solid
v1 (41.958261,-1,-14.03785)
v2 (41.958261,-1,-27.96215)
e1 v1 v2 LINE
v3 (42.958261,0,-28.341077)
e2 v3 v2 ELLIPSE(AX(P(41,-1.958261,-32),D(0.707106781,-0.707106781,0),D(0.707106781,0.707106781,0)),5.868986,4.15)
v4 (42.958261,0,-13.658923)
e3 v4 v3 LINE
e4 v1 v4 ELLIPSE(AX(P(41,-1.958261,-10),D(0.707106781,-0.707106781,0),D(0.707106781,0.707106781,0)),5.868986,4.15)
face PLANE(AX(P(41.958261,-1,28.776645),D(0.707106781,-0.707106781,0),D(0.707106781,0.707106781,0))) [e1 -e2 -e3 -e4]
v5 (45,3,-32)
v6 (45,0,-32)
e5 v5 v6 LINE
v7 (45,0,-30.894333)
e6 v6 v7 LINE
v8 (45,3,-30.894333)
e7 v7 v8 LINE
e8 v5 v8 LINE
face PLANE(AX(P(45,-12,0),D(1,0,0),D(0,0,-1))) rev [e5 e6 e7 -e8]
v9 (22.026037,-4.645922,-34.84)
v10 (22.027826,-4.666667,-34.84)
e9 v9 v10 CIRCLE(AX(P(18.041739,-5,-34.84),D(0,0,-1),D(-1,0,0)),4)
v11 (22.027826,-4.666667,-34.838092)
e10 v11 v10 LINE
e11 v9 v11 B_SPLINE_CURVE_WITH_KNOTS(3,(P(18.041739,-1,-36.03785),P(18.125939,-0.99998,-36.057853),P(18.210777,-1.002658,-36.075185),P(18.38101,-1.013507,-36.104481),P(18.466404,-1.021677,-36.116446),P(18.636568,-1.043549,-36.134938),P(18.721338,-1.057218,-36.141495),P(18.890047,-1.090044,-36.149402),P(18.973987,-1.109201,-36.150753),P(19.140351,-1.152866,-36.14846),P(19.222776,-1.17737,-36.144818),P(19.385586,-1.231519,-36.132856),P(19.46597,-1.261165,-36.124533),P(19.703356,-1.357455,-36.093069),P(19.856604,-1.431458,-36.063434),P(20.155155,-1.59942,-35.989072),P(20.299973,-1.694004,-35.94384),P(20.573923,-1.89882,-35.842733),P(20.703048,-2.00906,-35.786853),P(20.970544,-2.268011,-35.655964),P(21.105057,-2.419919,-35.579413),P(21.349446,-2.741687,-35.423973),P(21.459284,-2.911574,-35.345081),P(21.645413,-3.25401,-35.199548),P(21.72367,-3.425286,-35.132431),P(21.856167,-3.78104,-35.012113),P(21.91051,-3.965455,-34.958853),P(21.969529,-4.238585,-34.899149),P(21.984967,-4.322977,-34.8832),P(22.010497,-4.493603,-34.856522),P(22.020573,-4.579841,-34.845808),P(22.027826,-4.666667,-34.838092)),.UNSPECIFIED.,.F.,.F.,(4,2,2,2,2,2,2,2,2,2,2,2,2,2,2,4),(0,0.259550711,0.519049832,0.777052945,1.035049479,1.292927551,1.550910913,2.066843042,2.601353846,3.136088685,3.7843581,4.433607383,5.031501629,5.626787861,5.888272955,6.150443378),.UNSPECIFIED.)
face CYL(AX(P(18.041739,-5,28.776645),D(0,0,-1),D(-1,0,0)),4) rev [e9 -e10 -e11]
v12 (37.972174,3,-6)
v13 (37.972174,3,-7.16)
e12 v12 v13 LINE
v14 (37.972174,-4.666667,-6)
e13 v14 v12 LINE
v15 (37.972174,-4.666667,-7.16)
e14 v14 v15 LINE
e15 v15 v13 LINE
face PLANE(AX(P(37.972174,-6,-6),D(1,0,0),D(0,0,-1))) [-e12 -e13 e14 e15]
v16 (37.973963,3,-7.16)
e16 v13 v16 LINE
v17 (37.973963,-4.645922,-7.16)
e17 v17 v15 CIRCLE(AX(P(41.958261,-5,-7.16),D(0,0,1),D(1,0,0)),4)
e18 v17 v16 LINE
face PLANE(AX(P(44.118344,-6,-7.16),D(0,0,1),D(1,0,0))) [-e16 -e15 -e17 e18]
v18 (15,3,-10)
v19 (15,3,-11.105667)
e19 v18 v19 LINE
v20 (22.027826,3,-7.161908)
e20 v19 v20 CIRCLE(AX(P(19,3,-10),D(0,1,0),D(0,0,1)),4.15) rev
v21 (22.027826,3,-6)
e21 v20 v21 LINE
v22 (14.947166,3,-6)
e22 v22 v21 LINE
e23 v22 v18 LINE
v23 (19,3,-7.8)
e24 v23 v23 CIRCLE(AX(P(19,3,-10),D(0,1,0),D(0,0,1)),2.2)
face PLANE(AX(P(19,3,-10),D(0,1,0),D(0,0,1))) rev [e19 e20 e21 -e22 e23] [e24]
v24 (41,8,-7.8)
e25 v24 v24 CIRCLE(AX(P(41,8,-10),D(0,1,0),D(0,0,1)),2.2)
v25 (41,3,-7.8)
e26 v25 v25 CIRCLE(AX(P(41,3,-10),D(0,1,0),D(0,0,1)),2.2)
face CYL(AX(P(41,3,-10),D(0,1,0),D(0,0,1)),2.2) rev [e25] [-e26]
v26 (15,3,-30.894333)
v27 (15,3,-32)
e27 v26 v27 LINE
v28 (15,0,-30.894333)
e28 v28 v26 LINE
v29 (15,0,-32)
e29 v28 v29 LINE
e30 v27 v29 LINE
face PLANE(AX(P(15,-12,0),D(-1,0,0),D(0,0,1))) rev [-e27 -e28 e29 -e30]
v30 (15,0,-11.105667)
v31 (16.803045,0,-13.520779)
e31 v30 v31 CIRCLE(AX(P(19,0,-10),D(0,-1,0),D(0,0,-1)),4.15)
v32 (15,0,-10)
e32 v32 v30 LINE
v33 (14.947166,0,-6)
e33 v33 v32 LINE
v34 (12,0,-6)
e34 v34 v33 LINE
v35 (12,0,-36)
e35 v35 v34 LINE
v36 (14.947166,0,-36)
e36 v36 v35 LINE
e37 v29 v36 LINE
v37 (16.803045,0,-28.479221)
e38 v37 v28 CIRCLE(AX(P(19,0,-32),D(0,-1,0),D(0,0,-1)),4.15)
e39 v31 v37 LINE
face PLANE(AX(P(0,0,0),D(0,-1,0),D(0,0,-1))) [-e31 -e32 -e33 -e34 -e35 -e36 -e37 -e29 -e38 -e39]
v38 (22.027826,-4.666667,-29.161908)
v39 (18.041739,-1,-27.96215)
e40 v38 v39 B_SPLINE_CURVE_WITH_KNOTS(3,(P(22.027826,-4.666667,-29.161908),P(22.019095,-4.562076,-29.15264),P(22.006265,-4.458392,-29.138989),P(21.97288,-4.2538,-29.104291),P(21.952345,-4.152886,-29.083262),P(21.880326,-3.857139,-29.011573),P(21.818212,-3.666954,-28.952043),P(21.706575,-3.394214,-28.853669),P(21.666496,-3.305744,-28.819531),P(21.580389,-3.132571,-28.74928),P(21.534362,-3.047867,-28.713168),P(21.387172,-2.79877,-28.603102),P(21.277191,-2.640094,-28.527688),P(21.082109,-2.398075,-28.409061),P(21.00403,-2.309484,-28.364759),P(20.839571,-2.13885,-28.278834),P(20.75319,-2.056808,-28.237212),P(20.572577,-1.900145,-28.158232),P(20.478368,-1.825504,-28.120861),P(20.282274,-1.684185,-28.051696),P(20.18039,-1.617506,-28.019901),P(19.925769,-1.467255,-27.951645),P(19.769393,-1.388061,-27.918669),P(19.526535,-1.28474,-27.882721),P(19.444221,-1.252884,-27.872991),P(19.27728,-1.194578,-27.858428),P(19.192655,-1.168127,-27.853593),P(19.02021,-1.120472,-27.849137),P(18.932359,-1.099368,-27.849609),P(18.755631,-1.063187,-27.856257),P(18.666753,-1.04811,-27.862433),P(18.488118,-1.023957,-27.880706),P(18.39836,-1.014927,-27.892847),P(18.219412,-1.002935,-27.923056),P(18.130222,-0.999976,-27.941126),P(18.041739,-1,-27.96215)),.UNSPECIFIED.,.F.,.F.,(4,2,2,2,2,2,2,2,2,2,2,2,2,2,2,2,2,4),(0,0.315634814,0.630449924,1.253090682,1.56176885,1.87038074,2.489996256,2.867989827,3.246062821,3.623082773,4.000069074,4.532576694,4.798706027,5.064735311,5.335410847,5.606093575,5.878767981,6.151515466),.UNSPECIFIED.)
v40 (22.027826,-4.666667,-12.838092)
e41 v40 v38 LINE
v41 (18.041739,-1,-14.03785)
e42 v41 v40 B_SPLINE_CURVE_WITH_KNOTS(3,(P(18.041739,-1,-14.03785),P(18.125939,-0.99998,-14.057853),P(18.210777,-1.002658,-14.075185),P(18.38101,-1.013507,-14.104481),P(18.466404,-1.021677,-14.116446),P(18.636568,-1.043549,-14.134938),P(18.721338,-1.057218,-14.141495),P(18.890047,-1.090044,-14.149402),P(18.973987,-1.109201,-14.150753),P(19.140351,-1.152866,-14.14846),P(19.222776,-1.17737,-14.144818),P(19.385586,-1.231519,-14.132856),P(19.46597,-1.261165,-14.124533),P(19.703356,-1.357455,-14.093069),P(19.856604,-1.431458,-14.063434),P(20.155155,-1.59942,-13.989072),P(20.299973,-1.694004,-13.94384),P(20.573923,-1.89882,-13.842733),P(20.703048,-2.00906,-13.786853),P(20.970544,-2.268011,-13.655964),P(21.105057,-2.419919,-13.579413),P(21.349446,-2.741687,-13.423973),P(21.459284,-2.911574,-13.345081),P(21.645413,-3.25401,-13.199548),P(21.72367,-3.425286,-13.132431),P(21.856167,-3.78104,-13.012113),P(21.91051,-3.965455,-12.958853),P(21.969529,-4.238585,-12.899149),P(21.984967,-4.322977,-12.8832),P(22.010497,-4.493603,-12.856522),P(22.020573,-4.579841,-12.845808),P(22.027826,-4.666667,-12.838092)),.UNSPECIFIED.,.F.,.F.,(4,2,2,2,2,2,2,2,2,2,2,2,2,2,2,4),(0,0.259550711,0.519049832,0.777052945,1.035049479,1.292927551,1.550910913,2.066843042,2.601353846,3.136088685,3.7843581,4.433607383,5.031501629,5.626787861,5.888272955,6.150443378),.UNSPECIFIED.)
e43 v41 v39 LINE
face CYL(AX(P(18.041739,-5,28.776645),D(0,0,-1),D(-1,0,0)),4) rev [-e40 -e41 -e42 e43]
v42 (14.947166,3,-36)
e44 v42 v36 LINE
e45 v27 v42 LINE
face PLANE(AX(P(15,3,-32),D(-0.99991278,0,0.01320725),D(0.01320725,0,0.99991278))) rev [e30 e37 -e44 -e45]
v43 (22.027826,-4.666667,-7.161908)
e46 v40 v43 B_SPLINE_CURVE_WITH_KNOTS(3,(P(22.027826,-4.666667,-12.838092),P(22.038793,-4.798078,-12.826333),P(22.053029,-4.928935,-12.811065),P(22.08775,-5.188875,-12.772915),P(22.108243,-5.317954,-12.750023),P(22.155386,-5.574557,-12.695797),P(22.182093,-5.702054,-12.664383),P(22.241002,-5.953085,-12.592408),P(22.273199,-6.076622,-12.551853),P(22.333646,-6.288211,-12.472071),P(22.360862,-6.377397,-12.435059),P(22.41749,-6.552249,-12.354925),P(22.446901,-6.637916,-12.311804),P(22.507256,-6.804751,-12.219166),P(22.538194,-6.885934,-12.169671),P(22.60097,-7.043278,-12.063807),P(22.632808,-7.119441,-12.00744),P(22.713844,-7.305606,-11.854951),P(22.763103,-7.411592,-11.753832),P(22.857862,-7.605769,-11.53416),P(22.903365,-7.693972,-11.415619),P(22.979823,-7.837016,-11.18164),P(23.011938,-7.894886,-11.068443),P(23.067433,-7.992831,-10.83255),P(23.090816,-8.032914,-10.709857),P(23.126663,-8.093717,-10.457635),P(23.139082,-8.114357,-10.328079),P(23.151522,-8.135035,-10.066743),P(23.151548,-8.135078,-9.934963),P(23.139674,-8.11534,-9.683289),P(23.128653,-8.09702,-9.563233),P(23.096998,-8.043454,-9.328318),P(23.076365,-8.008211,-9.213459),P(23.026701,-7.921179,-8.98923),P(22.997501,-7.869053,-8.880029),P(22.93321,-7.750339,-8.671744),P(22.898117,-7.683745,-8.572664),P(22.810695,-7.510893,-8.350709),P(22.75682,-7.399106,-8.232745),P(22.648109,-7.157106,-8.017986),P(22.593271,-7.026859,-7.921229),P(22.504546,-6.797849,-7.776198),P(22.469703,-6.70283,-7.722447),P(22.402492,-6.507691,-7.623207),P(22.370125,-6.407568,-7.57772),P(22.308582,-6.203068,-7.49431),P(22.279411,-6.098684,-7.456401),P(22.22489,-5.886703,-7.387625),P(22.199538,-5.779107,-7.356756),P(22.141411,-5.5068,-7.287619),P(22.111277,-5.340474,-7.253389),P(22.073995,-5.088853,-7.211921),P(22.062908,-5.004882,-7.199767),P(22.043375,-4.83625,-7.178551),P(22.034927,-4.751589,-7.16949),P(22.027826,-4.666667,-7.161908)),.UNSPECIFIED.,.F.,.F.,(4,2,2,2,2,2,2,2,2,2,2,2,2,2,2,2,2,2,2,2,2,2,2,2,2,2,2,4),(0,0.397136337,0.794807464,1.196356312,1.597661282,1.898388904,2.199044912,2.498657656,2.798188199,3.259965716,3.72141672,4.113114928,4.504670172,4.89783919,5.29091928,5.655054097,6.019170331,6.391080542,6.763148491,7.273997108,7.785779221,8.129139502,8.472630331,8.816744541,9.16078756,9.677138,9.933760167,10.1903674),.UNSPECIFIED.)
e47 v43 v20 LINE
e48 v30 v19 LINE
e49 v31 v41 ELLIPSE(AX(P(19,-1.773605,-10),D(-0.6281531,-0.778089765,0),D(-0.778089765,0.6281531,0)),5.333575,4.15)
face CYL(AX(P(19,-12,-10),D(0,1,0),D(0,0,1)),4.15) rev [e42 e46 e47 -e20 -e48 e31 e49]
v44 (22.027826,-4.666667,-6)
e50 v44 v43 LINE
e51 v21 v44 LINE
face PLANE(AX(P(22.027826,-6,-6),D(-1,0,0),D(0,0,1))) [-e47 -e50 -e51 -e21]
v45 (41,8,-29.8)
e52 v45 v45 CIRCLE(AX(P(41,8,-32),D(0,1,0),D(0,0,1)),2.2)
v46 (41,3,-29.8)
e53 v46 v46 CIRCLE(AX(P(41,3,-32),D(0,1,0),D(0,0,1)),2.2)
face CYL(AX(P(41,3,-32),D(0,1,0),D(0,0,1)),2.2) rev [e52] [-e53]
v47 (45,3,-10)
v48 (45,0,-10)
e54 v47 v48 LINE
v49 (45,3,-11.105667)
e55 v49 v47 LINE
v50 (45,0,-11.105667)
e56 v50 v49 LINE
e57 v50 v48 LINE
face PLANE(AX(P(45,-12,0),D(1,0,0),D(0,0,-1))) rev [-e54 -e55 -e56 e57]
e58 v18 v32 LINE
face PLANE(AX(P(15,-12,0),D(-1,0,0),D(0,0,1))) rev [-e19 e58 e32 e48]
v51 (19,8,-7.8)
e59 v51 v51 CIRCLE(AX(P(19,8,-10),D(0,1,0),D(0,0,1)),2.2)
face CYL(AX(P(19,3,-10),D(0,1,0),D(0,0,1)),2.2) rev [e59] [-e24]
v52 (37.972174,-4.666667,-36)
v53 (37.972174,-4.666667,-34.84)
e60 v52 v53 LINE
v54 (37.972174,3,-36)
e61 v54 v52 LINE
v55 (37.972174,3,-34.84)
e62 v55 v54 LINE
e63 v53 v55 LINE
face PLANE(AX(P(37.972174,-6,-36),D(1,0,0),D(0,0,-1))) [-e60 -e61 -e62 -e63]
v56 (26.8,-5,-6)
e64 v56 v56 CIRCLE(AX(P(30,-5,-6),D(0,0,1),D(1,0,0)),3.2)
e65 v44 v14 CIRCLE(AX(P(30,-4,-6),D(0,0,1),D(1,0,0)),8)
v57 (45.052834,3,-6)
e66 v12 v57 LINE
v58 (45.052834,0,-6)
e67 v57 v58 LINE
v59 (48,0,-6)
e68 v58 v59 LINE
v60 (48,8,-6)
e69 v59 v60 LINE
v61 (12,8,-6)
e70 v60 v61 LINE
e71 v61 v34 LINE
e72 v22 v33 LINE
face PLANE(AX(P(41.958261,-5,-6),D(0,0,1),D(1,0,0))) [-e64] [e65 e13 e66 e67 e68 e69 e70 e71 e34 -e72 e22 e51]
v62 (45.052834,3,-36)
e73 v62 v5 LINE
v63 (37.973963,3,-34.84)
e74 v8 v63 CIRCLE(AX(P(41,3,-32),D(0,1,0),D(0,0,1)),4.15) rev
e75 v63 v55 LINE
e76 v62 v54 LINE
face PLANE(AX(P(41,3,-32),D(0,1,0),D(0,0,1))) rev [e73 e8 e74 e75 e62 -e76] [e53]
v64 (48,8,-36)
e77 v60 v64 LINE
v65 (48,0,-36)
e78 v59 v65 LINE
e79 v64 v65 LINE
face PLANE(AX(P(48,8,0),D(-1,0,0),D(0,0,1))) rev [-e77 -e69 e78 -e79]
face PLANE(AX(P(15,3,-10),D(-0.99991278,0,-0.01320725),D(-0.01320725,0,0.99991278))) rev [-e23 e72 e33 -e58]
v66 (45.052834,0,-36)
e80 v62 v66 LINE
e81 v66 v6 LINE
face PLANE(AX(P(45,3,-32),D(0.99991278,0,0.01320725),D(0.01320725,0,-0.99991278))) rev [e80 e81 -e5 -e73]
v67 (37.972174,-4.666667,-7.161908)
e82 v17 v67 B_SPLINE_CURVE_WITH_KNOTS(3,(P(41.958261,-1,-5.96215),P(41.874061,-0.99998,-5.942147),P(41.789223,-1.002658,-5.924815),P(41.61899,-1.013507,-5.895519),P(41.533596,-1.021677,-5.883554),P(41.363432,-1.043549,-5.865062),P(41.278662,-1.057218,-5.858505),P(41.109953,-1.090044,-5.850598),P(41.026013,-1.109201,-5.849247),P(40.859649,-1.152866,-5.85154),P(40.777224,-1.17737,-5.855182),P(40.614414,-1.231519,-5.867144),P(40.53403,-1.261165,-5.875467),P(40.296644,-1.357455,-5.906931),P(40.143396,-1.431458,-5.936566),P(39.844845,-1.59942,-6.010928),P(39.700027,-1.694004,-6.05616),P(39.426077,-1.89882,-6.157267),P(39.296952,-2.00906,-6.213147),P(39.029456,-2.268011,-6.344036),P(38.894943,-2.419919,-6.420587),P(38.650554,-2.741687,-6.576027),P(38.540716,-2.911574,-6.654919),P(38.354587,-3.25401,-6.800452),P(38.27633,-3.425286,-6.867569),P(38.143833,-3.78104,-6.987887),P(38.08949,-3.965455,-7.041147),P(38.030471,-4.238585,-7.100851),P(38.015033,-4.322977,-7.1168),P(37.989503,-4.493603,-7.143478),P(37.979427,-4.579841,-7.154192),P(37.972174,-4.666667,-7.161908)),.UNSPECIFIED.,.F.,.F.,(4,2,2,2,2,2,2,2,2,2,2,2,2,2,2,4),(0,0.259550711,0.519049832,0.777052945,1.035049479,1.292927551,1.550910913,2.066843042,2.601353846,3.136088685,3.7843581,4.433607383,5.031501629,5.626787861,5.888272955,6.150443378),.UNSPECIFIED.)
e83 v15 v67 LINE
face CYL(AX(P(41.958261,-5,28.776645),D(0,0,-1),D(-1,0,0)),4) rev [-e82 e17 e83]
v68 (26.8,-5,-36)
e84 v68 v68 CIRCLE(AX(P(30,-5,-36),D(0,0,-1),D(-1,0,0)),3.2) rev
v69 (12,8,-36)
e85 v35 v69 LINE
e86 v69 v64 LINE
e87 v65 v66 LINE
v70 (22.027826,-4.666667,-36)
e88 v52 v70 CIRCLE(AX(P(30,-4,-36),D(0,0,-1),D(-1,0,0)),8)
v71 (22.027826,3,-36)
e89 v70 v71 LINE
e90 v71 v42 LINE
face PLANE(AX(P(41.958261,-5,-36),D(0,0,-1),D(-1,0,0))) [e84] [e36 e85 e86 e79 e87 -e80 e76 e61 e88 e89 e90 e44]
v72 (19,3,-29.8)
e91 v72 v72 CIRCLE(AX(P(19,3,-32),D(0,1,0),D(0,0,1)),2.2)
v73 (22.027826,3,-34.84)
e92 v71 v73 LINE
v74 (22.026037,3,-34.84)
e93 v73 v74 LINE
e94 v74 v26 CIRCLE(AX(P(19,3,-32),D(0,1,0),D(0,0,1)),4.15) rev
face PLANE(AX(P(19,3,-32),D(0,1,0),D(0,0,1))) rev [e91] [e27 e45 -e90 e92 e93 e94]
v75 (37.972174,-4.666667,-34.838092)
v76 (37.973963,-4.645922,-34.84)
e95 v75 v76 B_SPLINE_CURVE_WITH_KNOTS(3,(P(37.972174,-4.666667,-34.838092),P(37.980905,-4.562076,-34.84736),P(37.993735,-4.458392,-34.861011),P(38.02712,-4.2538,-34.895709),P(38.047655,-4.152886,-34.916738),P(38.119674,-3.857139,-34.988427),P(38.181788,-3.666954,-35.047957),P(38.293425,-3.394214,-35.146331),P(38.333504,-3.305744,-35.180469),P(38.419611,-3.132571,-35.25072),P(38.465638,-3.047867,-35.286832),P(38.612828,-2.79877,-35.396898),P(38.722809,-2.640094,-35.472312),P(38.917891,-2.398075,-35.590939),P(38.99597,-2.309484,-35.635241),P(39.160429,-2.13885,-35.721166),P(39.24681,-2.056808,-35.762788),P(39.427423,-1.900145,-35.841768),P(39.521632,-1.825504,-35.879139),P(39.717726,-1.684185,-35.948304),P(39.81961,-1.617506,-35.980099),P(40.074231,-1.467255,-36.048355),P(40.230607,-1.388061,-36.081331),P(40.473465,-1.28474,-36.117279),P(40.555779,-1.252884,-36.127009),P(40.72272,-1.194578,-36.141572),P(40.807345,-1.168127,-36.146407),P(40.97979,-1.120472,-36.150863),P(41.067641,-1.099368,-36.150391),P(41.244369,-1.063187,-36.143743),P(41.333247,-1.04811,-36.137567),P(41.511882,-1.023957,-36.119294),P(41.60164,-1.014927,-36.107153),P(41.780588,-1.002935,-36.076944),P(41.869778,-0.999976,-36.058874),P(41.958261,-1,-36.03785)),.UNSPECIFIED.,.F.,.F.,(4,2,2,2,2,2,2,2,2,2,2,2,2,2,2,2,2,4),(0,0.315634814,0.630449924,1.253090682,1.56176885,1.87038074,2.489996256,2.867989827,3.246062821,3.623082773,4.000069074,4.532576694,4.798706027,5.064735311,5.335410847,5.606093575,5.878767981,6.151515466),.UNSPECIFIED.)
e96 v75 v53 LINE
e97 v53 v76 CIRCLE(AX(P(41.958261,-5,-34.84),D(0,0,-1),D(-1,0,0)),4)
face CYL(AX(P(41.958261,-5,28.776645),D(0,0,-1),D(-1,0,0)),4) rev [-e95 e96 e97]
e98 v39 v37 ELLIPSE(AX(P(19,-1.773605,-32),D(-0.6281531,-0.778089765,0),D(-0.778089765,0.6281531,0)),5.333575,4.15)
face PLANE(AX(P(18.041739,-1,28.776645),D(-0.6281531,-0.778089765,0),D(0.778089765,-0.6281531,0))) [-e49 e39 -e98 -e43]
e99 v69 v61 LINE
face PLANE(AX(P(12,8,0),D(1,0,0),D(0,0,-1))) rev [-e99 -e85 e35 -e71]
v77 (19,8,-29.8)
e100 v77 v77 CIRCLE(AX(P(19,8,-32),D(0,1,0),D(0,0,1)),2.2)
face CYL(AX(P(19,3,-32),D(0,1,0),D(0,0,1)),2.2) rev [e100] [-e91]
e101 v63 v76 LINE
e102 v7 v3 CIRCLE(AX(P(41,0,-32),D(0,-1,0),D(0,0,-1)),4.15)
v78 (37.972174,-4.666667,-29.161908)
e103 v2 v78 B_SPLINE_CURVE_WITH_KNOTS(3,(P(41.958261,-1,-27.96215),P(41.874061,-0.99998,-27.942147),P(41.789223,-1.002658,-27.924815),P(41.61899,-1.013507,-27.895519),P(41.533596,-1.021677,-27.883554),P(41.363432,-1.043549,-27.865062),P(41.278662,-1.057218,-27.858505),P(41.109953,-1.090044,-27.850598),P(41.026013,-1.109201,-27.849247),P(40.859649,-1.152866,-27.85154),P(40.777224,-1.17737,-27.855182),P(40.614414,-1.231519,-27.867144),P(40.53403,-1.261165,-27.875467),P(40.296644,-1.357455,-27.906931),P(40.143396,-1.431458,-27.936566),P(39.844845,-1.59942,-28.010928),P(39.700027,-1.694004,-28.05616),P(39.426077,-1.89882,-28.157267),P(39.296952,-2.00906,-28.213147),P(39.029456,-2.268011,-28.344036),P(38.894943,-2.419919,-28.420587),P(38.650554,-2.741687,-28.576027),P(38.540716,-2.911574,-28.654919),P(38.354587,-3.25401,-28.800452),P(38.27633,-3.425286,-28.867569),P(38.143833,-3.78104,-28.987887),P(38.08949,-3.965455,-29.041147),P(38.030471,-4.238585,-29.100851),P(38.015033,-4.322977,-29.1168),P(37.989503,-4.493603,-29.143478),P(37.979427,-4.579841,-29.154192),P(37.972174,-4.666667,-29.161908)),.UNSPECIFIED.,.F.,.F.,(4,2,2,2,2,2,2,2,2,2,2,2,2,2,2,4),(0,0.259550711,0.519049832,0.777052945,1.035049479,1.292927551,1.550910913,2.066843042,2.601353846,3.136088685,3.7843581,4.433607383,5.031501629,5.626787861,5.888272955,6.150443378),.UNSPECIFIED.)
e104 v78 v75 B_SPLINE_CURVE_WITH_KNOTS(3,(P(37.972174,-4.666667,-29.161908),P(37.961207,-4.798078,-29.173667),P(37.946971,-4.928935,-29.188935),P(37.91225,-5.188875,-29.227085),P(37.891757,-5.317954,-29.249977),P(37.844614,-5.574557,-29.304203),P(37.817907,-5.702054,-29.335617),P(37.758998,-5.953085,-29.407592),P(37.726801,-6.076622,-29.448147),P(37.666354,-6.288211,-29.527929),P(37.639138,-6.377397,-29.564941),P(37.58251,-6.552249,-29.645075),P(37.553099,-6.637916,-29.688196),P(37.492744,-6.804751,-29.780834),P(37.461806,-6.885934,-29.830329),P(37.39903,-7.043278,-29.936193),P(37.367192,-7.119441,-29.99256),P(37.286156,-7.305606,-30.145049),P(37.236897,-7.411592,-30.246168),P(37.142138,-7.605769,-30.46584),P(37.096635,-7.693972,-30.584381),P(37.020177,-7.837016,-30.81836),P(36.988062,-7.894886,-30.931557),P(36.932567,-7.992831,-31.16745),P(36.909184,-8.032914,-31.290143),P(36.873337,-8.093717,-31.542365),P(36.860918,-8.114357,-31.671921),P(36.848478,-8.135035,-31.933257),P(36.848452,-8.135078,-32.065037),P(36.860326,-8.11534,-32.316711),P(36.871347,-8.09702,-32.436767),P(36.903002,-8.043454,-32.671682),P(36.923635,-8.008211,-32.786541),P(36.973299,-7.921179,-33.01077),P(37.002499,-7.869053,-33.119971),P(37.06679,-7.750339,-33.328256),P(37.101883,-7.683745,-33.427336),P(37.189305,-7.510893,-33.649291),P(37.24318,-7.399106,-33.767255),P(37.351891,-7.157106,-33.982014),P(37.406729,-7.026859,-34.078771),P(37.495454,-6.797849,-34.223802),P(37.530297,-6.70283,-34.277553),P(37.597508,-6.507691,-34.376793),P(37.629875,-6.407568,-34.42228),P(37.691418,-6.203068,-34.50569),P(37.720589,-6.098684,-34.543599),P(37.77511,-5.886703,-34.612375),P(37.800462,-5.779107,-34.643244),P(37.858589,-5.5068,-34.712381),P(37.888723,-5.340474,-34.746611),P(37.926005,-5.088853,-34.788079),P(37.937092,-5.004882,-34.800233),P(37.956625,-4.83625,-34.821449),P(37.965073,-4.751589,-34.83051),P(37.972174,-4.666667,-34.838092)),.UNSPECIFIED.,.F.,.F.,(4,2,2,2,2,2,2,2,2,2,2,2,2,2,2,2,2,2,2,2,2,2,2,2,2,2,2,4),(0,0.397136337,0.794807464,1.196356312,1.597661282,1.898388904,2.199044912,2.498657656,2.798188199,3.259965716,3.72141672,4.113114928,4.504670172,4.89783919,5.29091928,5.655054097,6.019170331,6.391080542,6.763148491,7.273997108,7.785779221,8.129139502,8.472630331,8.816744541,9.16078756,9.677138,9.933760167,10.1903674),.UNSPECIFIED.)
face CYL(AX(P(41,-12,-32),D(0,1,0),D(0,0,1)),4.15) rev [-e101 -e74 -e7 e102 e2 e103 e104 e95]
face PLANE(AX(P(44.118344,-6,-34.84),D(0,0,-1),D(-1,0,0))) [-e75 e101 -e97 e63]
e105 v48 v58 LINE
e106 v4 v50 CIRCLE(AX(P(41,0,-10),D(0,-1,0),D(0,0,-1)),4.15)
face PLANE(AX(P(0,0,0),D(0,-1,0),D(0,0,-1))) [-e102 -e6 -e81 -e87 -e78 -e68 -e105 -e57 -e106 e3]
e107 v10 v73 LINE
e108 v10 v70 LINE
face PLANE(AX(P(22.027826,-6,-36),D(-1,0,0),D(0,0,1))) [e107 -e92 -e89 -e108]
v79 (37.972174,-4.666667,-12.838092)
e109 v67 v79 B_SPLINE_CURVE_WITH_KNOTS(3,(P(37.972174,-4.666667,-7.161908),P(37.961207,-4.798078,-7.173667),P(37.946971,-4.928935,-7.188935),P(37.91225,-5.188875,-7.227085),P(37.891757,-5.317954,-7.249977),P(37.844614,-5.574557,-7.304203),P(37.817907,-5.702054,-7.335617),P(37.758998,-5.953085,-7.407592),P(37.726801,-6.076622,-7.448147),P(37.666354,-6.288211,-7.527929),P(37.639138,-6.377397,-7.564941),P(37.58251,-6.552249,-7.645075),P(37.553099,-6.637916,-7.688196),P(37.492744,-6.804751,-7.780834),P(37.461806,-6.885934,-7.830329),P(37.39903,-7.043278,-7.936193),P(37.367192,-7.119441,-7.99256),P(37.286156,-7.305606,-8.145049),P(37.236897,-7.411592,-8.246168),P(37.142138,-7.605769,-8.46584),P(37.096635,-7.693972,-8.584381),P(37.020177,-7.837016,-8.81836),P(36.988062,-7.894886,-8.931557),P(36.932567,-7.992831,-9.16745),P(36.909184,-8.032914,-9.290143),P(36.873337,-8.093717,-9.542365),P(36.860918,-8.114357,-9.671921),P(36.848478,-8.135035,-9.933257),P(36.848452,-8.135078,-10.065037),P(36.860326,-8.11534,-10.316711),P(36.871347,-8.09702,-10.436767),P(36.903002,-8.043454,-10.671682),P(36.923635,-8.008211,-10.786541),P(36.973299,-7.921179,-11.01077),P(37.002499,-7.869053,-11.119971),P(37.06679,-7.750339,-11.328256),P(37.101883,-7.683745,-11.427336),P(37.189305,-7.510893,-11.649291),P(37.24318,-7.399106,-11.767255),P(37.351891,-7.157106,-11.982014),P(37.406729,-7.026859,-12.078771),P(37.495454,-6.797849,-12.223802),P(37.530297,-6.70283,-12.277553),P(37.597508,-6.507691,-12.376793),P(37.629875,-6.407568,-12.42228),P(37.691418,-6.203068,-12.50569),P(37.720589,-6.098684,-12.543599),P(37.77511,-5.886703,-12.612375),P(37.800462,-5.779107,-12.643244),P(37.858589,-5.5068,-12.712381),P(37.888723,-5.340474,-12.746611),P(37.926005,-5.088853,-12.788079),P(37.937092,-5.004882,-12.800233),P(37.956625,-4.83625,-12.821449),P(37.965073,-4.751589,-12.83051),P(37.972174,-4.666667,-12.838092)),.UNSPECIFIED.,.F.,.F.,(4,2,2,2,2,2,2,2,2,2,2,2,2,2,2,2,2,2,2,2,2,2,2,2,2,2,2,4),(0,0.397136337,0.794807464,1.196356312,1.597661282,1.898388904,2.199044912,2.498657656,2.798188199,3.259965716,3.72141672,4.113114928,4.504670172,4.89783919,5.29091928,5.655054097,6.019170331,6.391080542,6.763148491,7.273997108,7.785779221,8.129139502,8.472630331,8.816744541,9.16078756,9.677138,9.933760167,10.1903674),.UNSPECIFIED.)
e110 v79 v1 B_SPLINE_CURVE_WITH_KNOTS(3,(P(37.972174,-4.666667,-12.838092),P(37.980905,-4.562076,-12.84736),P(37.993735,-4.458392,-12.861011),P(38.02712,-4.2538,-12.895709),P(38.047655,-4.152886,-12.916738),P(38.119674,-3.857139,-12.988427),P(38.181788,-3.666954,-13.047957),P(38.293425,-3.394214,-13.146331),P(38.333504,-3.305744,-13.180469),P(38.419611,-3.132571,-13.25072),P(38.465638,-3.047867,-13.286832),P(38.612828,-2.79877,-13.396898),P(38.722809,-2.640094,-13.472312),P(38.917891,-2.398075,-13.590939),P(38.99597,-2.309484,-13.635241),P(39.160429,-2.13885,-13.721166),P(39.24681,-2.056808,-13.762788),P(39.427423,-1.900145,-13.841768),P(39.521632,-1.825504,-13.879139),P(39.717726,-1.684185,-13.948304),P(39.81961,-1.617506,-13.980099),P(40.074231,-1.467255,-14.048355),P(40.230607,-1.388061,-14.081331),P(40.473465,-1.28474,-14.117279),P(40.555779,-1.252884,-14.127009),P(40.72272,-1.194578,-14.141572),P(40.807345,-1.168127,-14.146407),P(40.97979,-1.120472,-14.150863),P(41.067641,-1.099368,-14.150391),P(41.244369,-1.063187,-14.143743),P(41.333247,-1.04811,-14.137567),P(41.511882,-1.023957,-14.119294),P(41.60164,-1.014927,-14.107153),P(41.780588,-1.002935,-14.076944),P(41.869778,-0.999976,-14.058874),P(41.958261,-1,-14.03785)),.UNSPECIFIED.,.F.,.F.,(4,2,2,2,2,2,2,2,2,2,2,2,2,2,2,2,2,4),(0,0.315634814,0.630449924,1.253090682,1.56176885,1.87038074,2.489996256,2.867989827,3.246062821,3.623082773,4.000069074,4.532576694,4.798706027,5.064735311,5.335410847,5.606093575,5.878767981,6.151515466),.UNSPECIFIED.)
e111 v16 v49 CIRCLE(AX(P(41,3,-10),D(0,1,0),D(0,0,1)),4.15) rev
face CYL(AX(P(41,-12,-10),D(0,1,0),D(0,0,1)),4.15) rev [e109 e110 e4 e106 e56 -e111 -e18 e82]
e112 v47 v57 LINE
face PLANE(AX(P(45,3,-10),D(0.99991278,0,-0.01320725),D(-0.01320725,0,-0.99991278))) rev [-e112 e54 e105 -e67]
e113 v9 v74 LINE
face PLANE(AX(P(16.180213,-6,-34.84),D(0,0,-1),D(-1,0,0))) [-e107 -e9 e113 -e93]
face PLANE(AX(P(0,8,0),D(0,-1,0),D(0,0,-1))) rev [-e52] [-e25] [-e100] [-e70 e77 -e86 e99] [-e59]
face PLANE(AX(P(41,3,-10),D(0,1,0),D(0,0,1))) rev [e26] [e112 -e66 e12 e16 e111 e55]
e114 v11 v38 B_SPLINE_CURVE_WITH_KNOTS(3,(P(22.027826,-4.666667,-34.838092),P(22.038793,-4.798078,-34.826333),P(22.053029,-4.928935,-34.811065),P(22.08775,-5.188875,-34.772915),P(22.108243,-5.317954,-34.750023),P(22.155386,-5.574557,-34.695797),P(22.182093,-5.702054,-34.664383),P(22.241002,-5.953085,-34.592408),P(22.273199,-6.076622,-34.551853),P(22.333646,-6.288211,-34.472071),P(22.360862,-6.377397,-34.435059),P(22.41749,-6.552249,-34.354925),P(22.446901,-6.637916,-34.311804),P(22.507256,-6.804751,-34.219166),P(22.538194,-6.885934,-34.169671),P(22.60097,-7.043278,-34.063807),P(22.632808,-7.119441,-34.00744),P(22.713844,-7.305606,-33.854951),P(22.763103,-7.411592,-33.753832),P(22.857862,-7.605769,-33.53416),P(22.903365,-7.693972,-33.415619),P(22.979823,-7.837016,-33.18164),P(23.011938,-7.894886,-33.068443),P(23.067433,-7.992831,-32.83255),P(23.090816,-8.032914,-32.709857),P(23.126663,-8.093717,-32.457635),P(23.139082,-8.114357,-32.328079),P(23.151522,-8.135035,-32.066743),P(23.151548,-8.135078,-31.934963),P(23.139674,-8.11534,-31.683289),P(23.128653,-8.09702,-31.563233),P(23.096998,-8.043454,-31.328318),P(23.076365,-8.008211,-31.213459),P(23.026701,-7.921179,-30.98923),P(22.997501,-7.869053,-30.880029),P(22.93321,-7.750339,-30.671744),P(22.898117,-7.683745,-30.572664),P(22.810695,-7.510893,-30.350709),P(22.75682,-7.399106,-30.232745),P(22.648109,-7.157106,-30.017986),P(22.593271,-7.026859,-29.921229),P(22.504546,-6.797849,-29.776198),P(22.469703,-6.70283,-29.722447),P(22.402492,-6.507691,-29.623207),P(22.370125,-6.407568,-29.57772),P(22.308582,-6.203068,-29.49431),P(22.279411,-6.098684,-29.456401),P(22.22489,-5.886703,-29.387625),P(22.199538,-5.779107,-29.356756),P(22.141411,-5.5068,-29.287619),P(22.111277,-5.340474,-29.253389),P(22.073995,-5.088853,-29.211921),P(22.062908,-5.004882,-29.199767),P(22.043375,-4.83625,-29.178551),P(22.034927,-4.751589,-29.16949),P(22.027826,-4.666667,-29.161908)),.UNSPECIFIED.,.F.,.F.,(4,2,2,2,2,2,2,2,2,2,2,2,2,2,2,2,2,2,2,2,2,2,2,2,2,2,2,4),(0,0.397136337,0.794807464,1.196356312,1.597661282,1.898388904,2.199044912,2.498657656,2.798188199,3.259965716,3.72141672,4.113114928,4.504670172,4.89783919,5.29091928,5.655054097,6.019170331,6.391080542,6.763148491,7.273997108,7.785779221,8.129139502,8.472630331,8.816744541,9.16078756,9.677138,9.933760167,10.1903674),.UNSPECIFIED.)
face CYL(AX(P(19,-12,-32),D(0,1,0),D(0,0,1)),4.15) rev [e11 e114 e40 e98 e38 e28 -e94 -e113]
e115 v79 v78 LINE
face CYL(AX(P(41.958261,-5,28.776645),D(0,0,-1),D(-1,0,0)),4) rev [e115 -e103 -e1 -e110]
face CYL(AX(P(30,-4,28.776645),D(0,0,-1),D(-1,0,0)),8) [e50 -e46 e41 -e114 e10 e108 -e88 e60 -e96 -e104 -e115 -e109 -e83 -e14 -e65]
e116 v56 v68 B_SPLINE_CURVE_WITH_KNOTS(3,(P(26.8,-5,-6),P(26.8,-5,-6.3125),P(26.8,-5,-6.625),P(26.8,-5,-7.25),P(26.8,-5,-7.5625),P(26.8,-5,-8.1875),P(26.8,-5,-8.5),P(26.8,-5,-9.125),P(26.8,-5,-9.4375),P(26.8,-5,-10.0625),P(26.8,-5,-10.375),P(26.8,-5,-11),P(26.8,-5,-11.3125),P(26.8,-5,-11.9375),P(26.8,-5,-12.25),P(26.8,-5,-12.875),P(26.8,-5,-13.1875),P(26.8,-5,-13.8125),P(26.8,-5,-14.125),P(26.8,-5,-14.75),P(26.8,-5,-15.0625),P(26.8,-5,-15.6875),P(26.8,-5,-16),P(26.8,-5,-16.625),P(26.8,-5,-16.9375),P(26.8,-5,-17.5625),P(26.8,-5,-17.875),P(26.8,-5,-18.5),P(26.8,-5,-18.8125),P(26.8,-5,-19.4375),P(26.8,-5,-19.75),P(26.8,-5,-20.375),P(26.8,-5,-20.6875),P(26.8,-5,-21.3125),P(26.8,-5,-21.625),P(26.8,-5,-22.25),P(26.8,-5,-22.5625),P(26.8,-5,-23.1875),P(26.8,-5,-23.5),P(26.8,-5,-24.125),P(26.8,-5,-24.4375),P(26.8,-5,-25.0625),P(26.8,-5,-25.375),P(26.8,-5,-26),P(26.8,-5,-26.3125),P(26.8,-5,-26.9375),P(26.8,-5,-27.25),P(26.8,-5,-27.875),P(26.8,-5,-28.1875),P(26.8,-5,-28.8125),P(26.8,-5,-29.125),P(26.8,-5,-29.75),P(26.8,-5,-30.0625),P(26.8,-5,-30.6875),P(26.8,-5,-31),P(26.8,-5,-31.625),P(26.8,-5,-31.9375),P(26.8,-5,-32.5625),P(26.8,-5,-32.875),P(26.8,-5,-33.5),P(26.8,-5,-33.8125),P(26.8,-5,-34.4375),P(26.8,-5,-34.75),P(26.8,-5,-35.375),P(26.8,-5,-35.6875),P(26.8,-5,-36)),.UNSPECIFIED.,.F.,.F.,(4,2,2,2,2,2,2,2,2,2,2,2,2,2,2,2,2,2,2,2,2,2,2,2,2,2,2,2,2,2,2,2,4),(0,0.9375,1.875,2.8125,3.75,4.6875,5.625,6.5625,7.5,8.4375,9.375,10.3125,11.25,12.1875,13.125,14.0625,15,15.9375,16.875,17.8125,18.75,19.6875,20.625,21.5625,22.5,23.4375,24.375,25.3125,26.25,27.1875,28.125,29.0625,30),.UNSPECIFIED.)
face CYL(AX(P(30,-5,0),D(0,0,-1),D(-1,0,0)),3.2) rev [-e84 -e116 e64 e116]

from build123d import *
from build123d.topology import SkipClean

# Parameters (mm, degrees)
SKETCH1_W            = 60
SKETCH1_H            = 42
BOSS_EXTRUDE1_DEPTH  = 8
SKETCH3_W            = 10
SKETCH3_H            = 42
BOSS_EXTRUDE5_DEPTH  = 6
SKETCH5_W            = 14
SKETCH5_H            = 42
BOSS_EXTRUDE6_DEPTH  = 11
SKETCH6_R            = 3.2
CUT_EXTRUDE1_DEPTH   = 75.565407529
FILLET1_R            = 7
FILLET2_R            = 5
FILLET3_R            = 5
BOSS_EXTRUDE7_DEPTH  = 42
SKETCH9_W            = 5
SKETCH9_H            = 42
BOSS_EXTRUDE8_DEPTH  = 6
SKETCH11_W           = 15
SKETCH11_H           = 42
CUT_EXTRUDE2_DEPTH   = 76.921011584
SKETCH12_W           = 30
SKETCH12_H           = 42
CUT_EXTRUDE3_DEPTH   = 6
SKETCH15_W           = 42
SKETCH15_H           = 8
BOSS_EXTRUDE9_DEPTH  = 5
SKETCH16_W           = 42
SKETCH16_H           = 8
BOSS_EXTRUDE10_DEPTH = 5
CUT_EXTRUDE7_START   = -17
CUT_EXTRUDE7_DEPTH   = 17
BOSS_EXTRUDE11_START = -5
SKETCH17_R           = 4.15
SKETCH17_R_2         = 2.2
BOSS_EXTRUDE11_DEPTH = 5
SKETCH18_W           = 2
SKETCH18_H           = 42
CUT_EXTRUDE8_DEPTH   = 67.392770772
CUT_EXTRUDE9_START   = -6
SKETCH19_R           = 3.2
CUT_EXTRUDE9_DEPTH   = 6
CUT_EXTRUDE10_DEPTH  = 6
SKETCH21_W           = 6.443242803
SKETCH21_H           = 1.161907564
SKETCH21_W_2         = 5.84761327
SKETCH21_H_2         = 1.16
SKETCH21_W_3         = 6.146169824
CUT_EXTRUDE11_DEPTH  = 6
CUT_EXTRUDE12_DEPTH  = 3
BOSS_EXTRUDE12_DEPTH = 6
BOSS_EXTRUDE13_DEPTH = 6


with BuildPart() as part:
    # Sketch1 → Boss-Extrude1 (new body)
    with BuildSketch(Plane(origin=(0, 0, 0), x_dir=(1, 0, 0), z_dir=(0, 1, 0))):
        with Locations((30, 21)):
            Rectangle(SKETCH1_W, SKETCH1_H)
    extrude(amount=BOSS_EXTRUDE1_DEPTH)

    # Sketch3 → Boss-Extrude5 (add)
    with BuildSketch(Plane(origin=(0, 8, 0), x_dir=(1, 0, 0), z_dir=(0, 1, 0))):
        with Locations((30, 21)):
            Rectangle(SKETCH3_W, SKETCH3_H)
    extrude(amount=BOSS_EXTRUDE5_DEPTH)

    # Sketch5 → Boss-Extrude6 (add)
    with BuildSketch(Plane.XZ):
        with Locations((30, -21)):
            Rectangle(SKETCH5_W, SKETCH5_H)
    extrude(amount=BOSS_EXTRUDE6_DEPTH)

    # Sketch6 → Cut-Extrude1 (cut, through all)
    with BuildSketch(Plane(origin=(0, 0, -42), x_dir=(-1, 0, 0), z_dir=(0, 0, -1))):
        with Locations((-30, -5)):
            Circle(SKETCH6_R)
    extrude(amount=-CUT_EXTRUDE1_DEPTH, mode=Mode.SUBTRACT)

    # Fillet1
    fillet1_edges = [part.edges().sort_by_distance(p)[0] for p in [
        (23, -11, -21),
        (37, -11, -21),
    ]]
    fillet(fillet1_edges, radius=FILLET1_R - 0.0001)  # a hair under: the kernel refuses the full size

    # Fillet2
    fillet2_edges = [part.edges().sort_by_distance(p)[0] for p in [
        (23, 0, -21),
    ]]
    fillet(fillet2_edges, radius=FILLET2_R)

    # Fillet3
    fillet3_edges = [part.edges().sort_by_distance(p)[0] for p in [
        (37, 0, -21),
    ]]
    fillet(fillet3_edges, radius=FILLET3_R)

    # Sketch8 → Boss-Extrude7 (add)
    with BuildSketch(Plane(origin=(0, 0, -42), x_dir=(-1, 0, 0), z_dir=(0, 0, -1))):
        with BuildLine():
            Line((-41.958260743, -1), (-42.958260743, 0))
            Line((-42.958260743, 0), (-41.958260743, 0))
            ThreePointArc((-41.958260743, 0), (-38.573244741, -1.320099639), (-36.9756521, -4.583333333))
            ThreePointArc((-36.9756521, -4.583333333), (-34.739022403, -9.151860505), (-30, -11))
            ThreePointArc((-30, -11), (-25.260977597, -9.151860505), (-23.0243479, -4.583333333))
            ThreePointArc((-23.0243479, -4.583333333), (-21.426755259, -1.320099639), (-18.041739257, 0))
            Line((-18.041739257, 0), (-16.803044796, 0))
            Line((-16.803044796, 0), (-18.041739257, -1))
            ThreePointArc((-18.041739257, -1), (-20.749752058, -2.056079711), (-22.027826171, -4.666666667))
            ThreePointArc((-22.027826171, -4.666666667), (-24.583974397, -9.887840578), (-30, -12))
            ThreePointArc((-30, -12), (-35.416025603, -9.887840578), (-37.972173829, -4.666666667))
            ThreePointArc((-37.972173829, -4.666666667), (-39.250247942, -2.056079711), (-41.958260743, -1))
        make_face()
    extrude(amount=-BOSS_EXTRUDE7_DEPTH)

    # Sketch9 → Boss-Extrude8 (add)
    with BuildSketch(Plane(origin=(0, 8, 0), x_dir=(1, 0, 0), z_dir=(0, 1, 0))):
        with Locations((42.5, 21)):
            Rectangle(SKETCH9_W, SKETCH9_H)
        with Locations((17.5, 21)):
            Rectangle(SKETCH9_W, SKETCH9_H)
    extrude(amount=BOSS_EXTRUDE8_DEPTH)

    # Sketch11 → Cut-Extrude2 (cut, through all)
    with BuildSketch(Plane(origin=(0, 8, 0), x_dir=(1, 0, 0), z_dir=(0, 1, 0))):
        with Locations((52.5, 21)):
            Rectangle(SKETCH11_W, SKETCH11_H)
        with Locations((7.5, 21)):
            Rectangle(SKETCH11_W, SKETCH11_H)
    extrude(amount=-CUT_EXTRUDE2_DEPTH, mode=Mode.SUBTRACT)

    # Sketch12 → Cut-Extrude3 (cut)
    with BuildSketch(Plane(origin=(0, 14, 0), x_dir=(1, 0, 0), z_dir=(0, 1, 0))):
        with Locations((30, 21)):
            Rectangle(SKETCH12_W, SKETCH12_H)
    extrude(amount=-CUT_EXTRUDE3_DEPTH, mode=Mode.SUBTRACT)

    # Sketch15 → Boss-Extrude9 (add)
    with BuildSketch(Plane.ZY.offset(-15)):
        with Locations((-21, 4)):
            Rectangle(SKETCH15_W, SKETCH15_H)
    extrude(amount=BOSS_EXTRUDE9_DEPTH)

    # Sketch16 → Boss-Extrude10 (add)
    with BuildSketch(Plane(origin=(45, 0, 0), x_dir=(0, 0, -1), z_dir=(1, 0, 0))):
        with Locations((21, 4)):
            Rectangle(SKETCH16_W, SKETCH16_H)
    extrude(amount=BOSS_EXTRUDE10_DEPTH)

    # Cut-Extrude7: read off the stored shape, not the designer's step
    # Cut-Extrude7 outline → Cut-Extrude7 (cut)
    with BuildSketch(Plane(origin=(0, 8, 0), x_dir=(1, 0, 0), z_dir=(0, 1, 0)).offset(CUT_EXTRUDE7_START)):
        with BuildLine():
            ThreePointArc((45, 33.105667219), (36.85, 32), (45, 30.894332781))
            Line((45, 30.894332781), (45, 33.105667219))
        make_face()
        with BuildLine():
            ThreePointArc((45, 11.105667219), (36.85, 10), (45, 8.894332781))
            Line((45, 8.894332781), (45, 11.105667219))
        make_face()
        with BuildLine():
            ThreePointArc((15, 8.894332781), (23.15, 10), (15, 11.105667219))
            Line((15, 11.105667219), (15, 8.894332781))
        make_face()
        with BuildLine():
            ThreePointArc((15, 30.894332781), (23.15, 32), (15, 33.105667219))
            Line((15, 33.105667219), (15, 30.894332781))
        make_face()
    extrude(amount=CUT_EXTRUDE7_DEPTH, mode=Mode.SUBTRACT)

    # Sketch17 → Boss-Extrude11 (add)
    # profile 1 of 4: a face of its own
    with BuildSketch(Plane(origin=(0, 8, 0), x_dir=(1, 0, 0), z_dir=(0, 1, 0)).offset(BOSS_EXTRUDE11_START)):
        with Locations((41, 32)):
            Circle(SKETCH17_R)
        with Locations(Location((41, 32, 0), (0, 0, 270))):
            Circle(SKETCH17_R_2, mode=Mode.SUBTRACT)
    # profile 2 of 4: a face of its own
    with BuildSketch(Plane(origin=(0, 8, 0), x_dir=(1, 0, 0), z_dir=(0, 1, 0)).offset(BOSS_EXTRUDE11_START)):
        with Locations((19, 10)):
            Circle(SKETCH17_R)
        with Locations(Location((19, 10, 0), (0, 0, 270))):
            Circle(SKETCH17_R_2, mode=Mode.SUBTRACT)
    # profile 3 of 4: a face of its own
    with BuildSketch(Plane(origin=(0, 8, 0), x_dir=(1, 0, 0), z_dir=(0, 1, 0)).offset(BOSS_EXTRUDE11_START)):
        with Locations((41, 10)):
            Circle(SKETCH17_R)
        with Locations(Location((41, 10, 0), (0, 0, 270))):
            Circle(SKETCH17_R_2, mode=Mode.SUBTRACT)
    # profile 4 of 4: a face of its own
    with BuildSketch(Plane(origin=(0, 8, 0), x_dir=(1, 0, 0), z_dir=(0, 1, 0)).offset(BOSS_EXTRUDE11_START)):
        with Locations((19, 32)):
            Circle(SKETCH17_R)
        with Locations(Location((19, 32, 0), (0, 0, 270))):
            Circle(SKETCH17_R_2, mode=Mode.SUBTRACT)
    extrude(amount=BOSS_EXTRUDE11_DEPTH)

    # Sketch18 → Cut-Extrude8 (cut, through all)
    with BuildSketch(Plane.XZ):
        with Locations((11, -21)):
            Rectangle(SKETCH18_W, SKETCH18_H)
        with Locations((49, -21)):
            Rectangle(SKETCH18_W, SKETCH18_H)
    extrude(amount=-CUT_EXTRUDE8_DEPTH, mode=Mode.SUBTRACT)

    # Sketch19 → Cut-Extrude9 (cut)
    with BuildSketch(Plane.XY.offset(CUT_EXTRUDE9_START)):
        with BuildLine():
            Line((48, 8), (48, 0))
            Line((48, 0), (42.958260743, 0))
            Line((42.958260743, 0), (41.958260743, -1))
            ThreePointArc((41.958260743, -1), (39.250247942, -2.056079711), (37.972173829, -4.666666667))
            ThreePointArc((37.972173829, -4.666666667), (30, -12), (22.027826171, -4.666666667))
            ThreePointArc((22.027826171, -4.666666667), (20.749752058, -2.056079711), (18.041739257, -1))
            Line((18.041739257, -1), (16.803044796, 0))
            Line((16.803044796, 0), (12, 0))
            Line((12, 0), (12, 8))
            Line((12, 8), (48, 8))
        make_face()
        with Locations(Location((30, -5, 0), (0, 0, 180))):
            Circle(SKETCH19_R, mode=Mode.SUBTRACT)
    extrude(amount=CUT_EXTRUDE9_DEPTH, mode=Mode.SUBTRACT)

    # Sketch20 → Cut-Extrude10 (cut)
    with BuildSketch(Plane(origin=(0, 0, -42), x_dir=(-1, 0, 0), z_dir=(0, 0, -1))):
        with BuildLine():
            Line((-16.803044796, 0), (-12, 0))
            Line((-12, 0), (-12, 8))
            Line((-12, 8), (-48, 8))
            Line((-48, 8), (-48, 0))
            Line((-48, 0), (-42.958260743, 0))
            Line((-42.958260743, 0), (-41.958260743, -1))
            ThreePointArc((-41.958260743, -1), (-39.250247942, -2.056079711), (-37.972173829, -4.666666667))
            ThreePointArc((-37.972173829, -4.666666667), (-30, -12), (-22.027826171, -4.666666667))
            ThreePointArc((-22.027826171, -4.666666667), (-20.749752058, -2.056079711), (-18.041739257, -1))
            Line((-18.041739257, -1), (-16.803044796, 0))
        make_face()
    extrude(amount=-CUT_EXTRUDE10_DEPTH, mode=Mode.SUBTRACT)

    # Sketch21 → Cut-Extrude11 (cut)
    with BuildSketch(Plane(origin=(0, 0, 0), x_dir=(-1, 0, 0), z_dir=(0, -1, 0))):
        with Locations((-18.806204769, 6.580953782)):
            Rectangle(SKETCH21_W, SKETCH21_H)
        with Locations((-19.104019536, 35.42)):
            Rectangle(SKETCH21_W_2, SKETCH21_H_2)
        with Locations((-41.045258741, 6.58)):
            Rectangle(SKETCH21_W_3, SKETCH21_H_2)
        with Locations((-41.045258741, 35.42)):
            Rectangle(SKETCH21_W_3, SKETCH21_H_2)
    extrude(amount=CUT_EXTRUDE11_DEPTH, mode=Mode.SUBTRACT)

    # Sketch22 → Cut-Extrude12 (cut, symmetric)
    with BuildSketch(Plane(origin=(0, 0, 0), x_dir=(-1, 0, 0), z_dir=(0, -1, 0))):
        Polygon((-36.85, 10), (-45, 10), (-45.05283361, 6), (-36.85, 6), align=None)
        Polygon((-45.05283361, 36), (-36.85, 36), (-36.85, 32), (-45, 32), align=None)
        Polygon((-14.94716639, 6), (-23.15, 6), (-23.15, 10), (-15, 10), align=None)
        Polygon((-15, 32), (-14.94716639, 36), (-23.15, 36), (-23.15, 32), align=None)
    extrude(amount=CUT_EXTRUDE12_DEPTH, both=True, mode=Mode.SUBTRACT)

    # Sketch24 → Boss-Extrude12 (add)
    with SkipClean():  # the faces are left unmerged after this step: merging them gives an invalid solid
        with BuildSketch(Plane(origin=(0, -3, 0), x_dir=(1, 0, 0), z_dir=(0, 1, 0))):
            with BuildLine():
                Line((22.027826171, 34.84), (22.026037012, 34.84))
                ThreePointArc((22.026037012, 34.84), (22.858792143, 33.527161812), (23.15, 32))
                Line((23.15, 32), (23.15, 36))
                Line((23.15, 36), (22.027826171, 36))
                Line((22.027826171, 36), (22.027826171, 34.84))
            make_face()
        extrude(amount=BOSS_EXTRUDE12_DEPTH)

    # Sketch25 → Boss-Extrude13 (add)
    with SkipClean():  # the faces are left unmerged after this step: merging them gives an invalid solid
        with BuildSketch(Plane(origin=(0, -3, 0), x_dir=(1, 0, 0), z_dir=(0, 1, 0))):
            with BuildLine():
                Line((37.973962988, 34.84), (37.972173829, 34.84))
                Line((37.972173829, 34.84), (37.972173829, 36))
                Line((37.972173829, 36), (36.85, 36))
                Line((36.85, 36), (36.85, 32))
                ThreePointArc((36.85, 32), (37.141207857, 33.527161812), (37.973962988, 34.84))
            make_face()
            with BuildLine():
                Line((36.85, 10), (36.85, 6))
                Line((36.85, 6), (37.972173829, 6))
                Line((37.972173829, 6), (37.972173829, 7.16))
                Line((37.972173829, 7.16), (37.973962988, 7.16))
                ThreePointArc((37.973962988, 7.16), (37.141207857, 8.472838188), (36.85, 10))
            make_face()
            with BuildLine():
                Line((22.027826171, 7.161907564), (22.027826171, 6))
                Line((22.027826171, 6), (23.15, 6))
                Line((23.15, 6), (23.15, 10))
                ThreePointArc((23.15, 10), (22.859273158, 8.474054164), (22.027826171, 7.161907564))
            make_face()
        extrude(amount=BOSS_EXTRUDE13_DEPTH)


solid = part.part
